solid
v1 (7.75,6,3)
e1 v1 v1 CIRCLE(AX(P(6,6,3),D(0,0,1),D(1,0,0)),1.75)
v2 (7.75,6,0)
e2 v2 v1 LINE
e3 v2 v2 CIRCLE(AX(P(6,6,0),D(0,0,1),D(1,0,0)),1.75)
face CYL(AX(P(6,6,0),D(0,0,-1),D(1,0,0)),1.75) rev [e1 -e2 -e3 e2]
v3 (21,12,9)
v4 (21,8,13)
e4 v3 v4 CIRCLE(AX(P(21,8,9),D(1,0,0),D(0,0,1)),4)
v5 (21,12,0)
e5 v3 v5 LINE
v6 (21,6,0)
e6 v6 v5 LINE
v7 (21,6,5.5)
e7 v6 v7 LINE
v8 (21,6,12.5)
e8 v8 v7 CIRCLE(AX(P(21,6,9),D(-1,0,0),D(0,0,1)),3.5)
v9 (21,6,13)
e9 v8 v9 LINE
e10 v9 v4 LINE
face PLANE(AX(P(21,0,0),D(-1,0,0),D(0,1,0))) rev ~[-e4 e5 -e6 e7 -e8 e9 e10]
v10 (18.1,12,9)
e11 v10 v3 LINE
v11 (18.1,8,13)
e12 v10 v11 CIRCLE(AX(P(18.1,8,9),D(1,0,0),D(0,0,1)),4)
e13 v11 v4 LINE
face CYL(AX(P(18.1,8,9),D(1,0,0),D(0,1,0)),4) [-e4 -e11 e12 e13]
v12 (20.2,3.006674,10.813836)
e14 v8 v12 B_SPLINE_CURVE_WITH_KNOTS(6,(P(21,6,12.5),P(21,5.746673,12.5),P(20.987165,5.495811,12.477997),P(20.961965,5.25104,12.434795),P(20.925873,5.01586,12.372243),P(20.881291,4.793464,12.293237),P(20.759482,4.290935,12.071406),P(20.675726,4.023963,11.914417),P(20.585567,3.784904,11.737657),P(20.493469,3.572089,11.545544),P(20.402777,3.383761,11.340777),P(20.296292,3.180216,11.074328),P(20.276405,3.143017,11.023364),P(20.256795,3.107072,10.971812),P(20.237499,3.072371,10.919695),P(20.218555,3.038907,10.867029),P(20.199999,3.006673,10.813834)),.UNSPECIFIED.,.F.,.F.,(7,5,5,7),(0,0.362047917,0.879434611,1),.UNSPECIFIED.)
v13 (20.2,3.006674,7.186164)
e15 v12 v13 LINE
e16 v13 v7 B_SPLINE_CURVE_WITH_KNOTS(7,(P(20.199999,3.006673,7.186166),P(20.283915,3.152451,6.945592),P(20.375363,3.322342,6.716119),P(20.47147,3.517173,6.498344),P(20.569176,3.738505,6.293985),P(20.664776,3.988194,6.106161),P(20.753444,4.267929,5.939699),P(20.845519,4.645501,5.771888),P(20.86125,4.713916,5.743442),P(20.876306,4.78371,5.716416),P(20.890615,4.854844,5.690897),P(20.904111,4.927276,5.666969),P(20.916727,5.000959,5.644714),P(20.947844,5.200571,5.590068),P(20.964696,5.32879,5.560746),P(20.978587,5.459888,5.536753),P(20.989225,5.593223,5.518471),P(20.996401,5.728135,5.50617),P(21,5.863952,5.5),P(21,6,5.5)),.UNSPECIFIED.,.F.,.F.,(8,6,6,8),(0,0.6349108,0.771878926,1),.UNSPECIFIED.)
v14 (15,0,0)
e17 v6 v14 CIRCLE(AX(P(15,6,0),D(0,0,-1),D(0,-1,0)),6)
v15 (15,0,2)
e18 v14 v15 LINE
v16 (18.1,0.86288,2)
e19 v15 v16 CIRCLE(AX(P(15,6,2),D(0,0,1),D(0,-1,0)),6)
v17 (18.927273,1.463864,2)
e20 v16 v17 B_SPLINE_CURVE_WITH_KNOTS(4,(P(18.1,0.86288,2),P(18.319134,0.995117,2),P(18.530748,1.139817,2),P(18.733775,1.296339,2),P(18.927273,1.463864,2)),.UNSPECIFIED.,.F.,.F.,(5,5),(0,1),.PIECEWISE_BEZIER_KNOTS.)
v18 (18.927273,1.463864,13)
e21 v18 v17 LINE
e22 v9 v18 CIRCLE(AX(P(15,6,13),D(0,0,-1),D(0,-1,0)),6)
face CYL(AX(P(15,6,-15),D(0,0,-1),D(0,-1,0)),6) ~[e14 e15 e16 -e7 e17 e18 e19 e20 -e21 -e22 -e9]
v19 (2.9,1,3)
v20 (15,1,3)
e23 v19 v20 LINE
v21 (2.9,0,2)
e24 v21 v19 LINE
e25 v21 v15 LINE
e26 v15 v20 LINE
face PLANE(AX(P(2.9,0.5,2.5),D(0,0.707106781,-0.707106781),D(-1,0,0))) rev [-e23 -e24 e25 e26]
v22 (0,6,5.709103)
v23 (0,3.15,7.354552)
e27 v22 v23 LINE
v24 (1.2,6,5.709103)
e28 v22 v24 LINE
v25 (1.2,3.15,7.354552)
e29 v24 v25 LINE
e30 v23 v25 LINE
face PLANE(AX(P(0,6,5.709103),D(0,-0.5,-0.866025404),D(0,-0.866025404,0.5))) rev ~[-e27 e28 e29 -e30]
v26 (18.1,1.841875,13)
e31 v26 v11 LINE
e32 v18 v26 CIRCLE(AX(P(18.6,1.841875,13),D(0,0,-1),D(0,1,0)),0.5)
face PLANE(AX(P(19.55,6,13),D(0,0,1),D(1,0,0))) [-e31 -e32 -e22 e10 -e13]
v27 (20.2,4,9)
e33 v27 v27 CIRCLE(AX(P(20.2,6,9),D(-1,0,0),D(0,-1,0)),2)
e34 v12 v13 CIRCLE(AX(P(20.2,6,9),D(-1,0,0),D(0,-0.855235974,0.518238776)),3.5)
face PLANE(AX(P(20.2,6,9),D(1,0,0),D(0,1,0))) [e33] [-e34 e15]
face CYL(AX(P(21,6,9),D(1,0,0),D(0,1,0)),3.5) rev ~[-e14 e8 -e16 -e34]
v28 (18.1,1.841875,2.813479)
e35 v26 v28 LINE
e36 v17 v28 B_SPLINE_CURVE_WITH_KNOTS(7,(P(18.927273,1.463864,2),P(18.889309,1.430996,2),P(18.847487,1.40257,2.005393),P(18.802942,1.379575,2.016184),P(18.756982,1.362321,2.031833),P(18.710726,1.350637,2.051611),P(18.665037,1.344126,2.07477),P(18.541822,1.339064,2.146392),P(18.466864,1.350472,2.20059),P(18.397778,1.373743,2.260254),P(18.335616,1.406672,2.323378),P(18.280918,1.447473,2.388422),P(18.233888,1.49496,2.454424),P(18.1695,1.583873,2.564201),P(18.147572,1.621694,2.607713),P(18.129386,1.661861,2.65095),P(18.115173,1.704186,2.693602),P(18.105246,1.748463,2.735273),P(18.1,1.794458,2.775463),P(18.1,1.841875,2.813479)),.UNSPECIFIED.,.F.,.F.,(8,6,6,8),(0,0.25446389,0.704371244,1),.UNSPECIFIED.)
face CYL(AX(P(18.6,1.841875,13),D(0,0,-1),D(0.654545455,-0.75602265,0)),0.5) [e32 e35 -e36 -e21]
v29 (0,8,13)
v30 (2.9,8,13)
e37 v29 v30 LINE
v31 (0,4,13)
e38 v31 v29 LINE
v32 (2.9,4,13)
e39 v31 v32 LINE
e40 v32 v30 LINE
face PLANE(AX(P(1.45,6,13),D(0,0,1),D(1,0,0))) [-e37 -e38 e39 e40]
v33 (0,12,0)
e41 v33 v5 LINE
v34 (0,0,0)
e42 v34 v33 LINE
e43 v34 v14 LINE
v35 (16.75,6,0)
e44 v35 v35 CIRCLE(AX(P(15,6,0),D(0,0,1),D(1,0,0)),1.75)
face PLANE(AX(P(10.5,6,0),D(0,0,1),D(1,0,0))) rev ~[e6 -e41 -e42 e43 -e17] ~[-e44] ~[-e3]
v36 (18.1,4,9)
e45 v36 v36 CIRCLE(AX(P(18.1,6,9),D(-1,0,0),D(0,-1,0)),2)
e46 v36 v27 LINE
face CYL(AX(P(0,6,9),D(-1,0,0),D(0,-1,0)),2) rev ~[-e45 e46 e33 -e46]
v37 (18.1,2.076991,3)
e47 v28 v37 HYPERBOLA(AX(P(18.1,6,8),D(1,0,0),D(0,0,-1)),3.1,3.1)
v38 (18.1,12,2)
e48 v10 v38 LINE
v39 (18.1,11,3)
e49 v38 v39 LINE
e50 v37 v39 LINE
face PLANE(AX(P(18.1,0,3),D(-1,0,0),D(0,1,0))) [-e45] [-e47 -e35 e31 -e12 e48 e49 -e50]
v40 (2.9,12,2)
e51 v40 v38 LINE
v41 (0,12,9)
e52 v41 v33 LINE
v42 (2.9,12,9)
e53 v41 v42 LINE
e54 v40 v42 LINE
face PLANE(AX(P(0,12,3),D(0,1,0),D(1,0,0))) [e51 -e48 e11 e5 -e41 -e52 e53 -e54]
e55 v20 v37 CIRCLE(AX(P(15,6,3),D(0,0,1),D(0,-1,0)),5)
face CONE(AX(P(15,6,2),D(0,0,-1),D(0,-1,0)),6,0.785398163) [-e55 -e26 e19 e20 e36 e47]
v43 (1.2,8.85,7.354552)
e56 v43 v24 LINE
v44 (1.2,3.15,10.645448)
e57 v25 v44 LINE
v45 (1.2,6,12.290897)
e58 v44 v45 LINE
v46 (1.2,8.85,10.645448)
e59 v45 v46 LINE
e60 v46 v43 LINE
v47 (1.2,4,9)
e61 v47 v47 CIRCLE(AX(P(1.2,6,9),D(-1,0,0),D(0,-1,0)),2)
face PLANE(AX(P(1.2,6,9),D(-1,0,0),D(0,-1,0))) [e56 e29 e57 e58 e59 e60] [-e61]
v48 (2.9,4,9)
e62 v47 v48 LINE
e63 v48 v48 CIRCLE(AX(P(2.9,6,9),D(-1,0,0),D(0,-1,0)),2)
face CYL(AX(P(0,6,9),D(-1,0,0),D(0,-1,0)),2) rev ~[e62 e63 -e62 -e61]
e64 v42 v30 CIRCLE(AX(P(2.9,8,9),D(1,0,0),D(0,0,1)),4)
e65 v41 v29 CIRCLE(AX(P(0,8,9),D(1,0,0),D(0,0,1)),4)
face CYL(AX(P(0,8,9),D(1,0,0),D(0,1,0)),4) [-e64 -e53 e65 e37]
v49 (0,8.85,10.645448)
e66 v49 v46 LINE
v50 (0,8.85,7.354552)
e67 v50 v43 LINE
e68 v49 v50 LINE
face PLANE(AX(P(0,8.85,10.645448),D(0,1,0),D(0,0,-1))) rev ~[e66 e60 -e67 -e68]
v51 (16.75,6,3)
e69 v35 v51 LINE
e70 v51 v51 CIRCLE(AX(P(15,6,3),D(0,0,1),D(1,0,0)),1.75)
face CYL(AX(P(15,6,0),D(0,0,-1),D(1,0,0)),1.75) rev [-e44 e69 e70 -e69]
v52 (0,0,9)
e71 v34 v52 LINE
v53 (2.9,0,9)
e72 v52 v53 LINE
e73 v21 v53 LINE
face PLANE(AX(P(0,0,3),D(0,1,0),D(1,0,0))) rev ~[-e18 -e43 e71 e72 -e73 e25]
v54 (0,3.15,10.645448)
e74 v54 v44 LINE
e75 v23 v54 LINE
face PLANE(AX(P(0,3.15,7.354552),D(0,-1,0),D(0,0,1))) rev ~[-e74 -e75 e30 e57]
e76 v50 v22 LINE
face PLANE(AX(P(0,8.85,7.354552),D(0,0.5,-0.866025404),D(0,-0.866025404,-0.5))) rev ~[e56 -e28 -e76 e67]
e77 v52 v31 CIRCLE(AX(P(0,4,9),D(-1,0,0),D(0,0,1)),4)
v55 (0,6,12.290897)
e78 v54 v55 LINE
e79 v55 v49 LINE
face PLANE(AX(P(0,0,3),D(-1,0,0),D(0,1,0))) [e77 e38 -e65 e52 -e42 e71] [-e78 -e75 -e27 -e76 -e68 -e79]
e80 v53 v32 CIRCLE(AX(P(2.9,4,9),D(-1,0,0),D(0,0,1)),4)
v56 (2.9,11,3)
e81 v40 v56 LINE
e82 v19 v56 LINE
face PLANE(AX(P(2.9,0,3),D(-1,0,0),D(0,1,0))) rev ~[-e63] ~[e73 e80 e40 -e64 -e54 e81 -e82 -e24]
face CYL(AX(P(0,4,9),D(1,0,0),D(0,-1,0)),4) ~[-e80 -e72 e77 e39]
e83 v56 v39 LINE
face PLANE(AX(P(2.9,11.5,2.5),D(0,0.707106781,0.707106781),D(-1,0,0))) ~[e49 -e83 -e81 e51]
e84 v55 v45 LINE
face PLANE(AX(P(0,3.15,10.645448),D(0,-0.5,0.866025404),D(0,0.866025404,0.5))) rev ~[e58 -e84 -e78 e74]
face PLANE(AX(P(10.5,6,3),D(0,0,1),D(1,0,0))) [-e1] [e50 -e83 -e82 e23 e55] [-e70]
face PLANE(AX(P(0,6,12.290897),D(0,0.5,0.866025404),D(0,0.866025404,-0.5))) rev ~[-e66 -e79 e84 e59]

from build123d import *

# Parameters (mm, degrees)
F0_W        = 21
F0_H        = 12
F0_R        = 1.75
F1_DEPTH    = 3
F2_W        = 2.9
F2_H        = 12
F3_DEPTH    = 10
F4_R        = 2
F5_DEPTH    = 21.001
F6_T1_DEPTH = 43
F7_SIZE     = 1
F8_R        = 4
F9_R        = 0.5
F10_R       = 3.5
F11_DEPTH   = 0.8
F13_DEPTH   = 1.2


# Not quite as in the source:
# - a fillet or chamfer that OpenCascade refuses, or shapes differently, is made with other operations: its cross-section is extruded or revolved along the edge and cut away or added


with BuildPart() as f1:
    # F0 (on Top) → F1 (new body)
    with BuildSketch(Plane.XY):
        with Locations((10.5, 6)):
            Rectangle(F0_W, F0_H)
        with Locations((6, 6)):
            Circle(F0_R, mode=Mode.SUBTRACT)
        with Locations((15, 6)):
            Circle(F0_R, mode=Mode.SUBTRACT)
    extrude(amount=F1_DEPTH)

    # F2 (on face) → F3 (join)
    with BuildSketch(Plane.XY.offset(3)):
        with Locations((1.45, 6)):
            Rectangle(F2_W, F2_H)
        with Locations((19.55, 6)):
            Rectangle(F2_W, F2_H)
    extrude(amount=F3_DEPTH)

    # F4 (on face) → F5 (cut, through all)
    with BuildSketch(Plane(origin=(0, 0, 0), x_dir=(0, -1, 0), z_dir=(-1, 0, 0))):
        with Locations((-6, 9)):
            Circle(F4_R)
    extrude(amount=-F5_DEPTH, mode=Mode.SUBTRACT)

    # F6: fillet of radius 6 on 1 edges, made by hand

    # F6_s2 → F6_t1 (cut)
    with BuildSketch(Plane.XY.offset(-15)):
        with BuildLine():
            ThreePointArc((15, 0), (19.2426406871, 1.7573593129), (21, 6))
            Line((21, 6), (21, 0))
            Line((21, 0), (15, 0))
        make_face()
    extrude(amount=F6_T1_DEPTH, mode=Mode.SUBTRACT)

    # F7
    f7_edges = [f1.edges().sort_by_distance(p)[0] for p in [
        (8.95, 0, 3),
        (10.5, 12, 3),
    ]]
    chamfer(f7_edges, length=F7_SIZE)

    # F8
    f8_edges = [f1.edges().sort_by_distance(p)[0] for p in [
        (19.55, 12, 13),
        (1.45, 0, 13),
        (1.45, 12, 13),
    ]]
    fillet(f8_edges, radius=F8_R)

    # F9
    f9_edges = [f1.edges().sort_by_distance(p)[0] for p in [
        (18.1, 0.86288, 8),
    ]]
    fillet(f9_edges, radius=F9_R)

    # F10 (on face) → F11 (cut)
    with BuildSketch(Plane.YZ.offset(21)):
        with Locations((6, 9)):
            Circle(F10_R)
    extrude(amount=-F11_DEPTH, mode=Mode.SUBTRACT)

    # F12 (on face) → F13 (cut)
    with BuildSketch(Plane(origin=(0, 0, 0), x_dir=(0, -1, 0), z_dir=(-1, 0, 0))):
        Polygon((-3.15, 7.3545517328), (-3.15, 10.6454482672), (-6, 12.2908965344), (-8.85, 10.6454482672), (-8.85, 7.3545517328), (-6, 5.7091034656), align=None)
    extrude(amount=-F13_DEPTH, mode=Mode.SUBTRACT)


solid = f1.part
